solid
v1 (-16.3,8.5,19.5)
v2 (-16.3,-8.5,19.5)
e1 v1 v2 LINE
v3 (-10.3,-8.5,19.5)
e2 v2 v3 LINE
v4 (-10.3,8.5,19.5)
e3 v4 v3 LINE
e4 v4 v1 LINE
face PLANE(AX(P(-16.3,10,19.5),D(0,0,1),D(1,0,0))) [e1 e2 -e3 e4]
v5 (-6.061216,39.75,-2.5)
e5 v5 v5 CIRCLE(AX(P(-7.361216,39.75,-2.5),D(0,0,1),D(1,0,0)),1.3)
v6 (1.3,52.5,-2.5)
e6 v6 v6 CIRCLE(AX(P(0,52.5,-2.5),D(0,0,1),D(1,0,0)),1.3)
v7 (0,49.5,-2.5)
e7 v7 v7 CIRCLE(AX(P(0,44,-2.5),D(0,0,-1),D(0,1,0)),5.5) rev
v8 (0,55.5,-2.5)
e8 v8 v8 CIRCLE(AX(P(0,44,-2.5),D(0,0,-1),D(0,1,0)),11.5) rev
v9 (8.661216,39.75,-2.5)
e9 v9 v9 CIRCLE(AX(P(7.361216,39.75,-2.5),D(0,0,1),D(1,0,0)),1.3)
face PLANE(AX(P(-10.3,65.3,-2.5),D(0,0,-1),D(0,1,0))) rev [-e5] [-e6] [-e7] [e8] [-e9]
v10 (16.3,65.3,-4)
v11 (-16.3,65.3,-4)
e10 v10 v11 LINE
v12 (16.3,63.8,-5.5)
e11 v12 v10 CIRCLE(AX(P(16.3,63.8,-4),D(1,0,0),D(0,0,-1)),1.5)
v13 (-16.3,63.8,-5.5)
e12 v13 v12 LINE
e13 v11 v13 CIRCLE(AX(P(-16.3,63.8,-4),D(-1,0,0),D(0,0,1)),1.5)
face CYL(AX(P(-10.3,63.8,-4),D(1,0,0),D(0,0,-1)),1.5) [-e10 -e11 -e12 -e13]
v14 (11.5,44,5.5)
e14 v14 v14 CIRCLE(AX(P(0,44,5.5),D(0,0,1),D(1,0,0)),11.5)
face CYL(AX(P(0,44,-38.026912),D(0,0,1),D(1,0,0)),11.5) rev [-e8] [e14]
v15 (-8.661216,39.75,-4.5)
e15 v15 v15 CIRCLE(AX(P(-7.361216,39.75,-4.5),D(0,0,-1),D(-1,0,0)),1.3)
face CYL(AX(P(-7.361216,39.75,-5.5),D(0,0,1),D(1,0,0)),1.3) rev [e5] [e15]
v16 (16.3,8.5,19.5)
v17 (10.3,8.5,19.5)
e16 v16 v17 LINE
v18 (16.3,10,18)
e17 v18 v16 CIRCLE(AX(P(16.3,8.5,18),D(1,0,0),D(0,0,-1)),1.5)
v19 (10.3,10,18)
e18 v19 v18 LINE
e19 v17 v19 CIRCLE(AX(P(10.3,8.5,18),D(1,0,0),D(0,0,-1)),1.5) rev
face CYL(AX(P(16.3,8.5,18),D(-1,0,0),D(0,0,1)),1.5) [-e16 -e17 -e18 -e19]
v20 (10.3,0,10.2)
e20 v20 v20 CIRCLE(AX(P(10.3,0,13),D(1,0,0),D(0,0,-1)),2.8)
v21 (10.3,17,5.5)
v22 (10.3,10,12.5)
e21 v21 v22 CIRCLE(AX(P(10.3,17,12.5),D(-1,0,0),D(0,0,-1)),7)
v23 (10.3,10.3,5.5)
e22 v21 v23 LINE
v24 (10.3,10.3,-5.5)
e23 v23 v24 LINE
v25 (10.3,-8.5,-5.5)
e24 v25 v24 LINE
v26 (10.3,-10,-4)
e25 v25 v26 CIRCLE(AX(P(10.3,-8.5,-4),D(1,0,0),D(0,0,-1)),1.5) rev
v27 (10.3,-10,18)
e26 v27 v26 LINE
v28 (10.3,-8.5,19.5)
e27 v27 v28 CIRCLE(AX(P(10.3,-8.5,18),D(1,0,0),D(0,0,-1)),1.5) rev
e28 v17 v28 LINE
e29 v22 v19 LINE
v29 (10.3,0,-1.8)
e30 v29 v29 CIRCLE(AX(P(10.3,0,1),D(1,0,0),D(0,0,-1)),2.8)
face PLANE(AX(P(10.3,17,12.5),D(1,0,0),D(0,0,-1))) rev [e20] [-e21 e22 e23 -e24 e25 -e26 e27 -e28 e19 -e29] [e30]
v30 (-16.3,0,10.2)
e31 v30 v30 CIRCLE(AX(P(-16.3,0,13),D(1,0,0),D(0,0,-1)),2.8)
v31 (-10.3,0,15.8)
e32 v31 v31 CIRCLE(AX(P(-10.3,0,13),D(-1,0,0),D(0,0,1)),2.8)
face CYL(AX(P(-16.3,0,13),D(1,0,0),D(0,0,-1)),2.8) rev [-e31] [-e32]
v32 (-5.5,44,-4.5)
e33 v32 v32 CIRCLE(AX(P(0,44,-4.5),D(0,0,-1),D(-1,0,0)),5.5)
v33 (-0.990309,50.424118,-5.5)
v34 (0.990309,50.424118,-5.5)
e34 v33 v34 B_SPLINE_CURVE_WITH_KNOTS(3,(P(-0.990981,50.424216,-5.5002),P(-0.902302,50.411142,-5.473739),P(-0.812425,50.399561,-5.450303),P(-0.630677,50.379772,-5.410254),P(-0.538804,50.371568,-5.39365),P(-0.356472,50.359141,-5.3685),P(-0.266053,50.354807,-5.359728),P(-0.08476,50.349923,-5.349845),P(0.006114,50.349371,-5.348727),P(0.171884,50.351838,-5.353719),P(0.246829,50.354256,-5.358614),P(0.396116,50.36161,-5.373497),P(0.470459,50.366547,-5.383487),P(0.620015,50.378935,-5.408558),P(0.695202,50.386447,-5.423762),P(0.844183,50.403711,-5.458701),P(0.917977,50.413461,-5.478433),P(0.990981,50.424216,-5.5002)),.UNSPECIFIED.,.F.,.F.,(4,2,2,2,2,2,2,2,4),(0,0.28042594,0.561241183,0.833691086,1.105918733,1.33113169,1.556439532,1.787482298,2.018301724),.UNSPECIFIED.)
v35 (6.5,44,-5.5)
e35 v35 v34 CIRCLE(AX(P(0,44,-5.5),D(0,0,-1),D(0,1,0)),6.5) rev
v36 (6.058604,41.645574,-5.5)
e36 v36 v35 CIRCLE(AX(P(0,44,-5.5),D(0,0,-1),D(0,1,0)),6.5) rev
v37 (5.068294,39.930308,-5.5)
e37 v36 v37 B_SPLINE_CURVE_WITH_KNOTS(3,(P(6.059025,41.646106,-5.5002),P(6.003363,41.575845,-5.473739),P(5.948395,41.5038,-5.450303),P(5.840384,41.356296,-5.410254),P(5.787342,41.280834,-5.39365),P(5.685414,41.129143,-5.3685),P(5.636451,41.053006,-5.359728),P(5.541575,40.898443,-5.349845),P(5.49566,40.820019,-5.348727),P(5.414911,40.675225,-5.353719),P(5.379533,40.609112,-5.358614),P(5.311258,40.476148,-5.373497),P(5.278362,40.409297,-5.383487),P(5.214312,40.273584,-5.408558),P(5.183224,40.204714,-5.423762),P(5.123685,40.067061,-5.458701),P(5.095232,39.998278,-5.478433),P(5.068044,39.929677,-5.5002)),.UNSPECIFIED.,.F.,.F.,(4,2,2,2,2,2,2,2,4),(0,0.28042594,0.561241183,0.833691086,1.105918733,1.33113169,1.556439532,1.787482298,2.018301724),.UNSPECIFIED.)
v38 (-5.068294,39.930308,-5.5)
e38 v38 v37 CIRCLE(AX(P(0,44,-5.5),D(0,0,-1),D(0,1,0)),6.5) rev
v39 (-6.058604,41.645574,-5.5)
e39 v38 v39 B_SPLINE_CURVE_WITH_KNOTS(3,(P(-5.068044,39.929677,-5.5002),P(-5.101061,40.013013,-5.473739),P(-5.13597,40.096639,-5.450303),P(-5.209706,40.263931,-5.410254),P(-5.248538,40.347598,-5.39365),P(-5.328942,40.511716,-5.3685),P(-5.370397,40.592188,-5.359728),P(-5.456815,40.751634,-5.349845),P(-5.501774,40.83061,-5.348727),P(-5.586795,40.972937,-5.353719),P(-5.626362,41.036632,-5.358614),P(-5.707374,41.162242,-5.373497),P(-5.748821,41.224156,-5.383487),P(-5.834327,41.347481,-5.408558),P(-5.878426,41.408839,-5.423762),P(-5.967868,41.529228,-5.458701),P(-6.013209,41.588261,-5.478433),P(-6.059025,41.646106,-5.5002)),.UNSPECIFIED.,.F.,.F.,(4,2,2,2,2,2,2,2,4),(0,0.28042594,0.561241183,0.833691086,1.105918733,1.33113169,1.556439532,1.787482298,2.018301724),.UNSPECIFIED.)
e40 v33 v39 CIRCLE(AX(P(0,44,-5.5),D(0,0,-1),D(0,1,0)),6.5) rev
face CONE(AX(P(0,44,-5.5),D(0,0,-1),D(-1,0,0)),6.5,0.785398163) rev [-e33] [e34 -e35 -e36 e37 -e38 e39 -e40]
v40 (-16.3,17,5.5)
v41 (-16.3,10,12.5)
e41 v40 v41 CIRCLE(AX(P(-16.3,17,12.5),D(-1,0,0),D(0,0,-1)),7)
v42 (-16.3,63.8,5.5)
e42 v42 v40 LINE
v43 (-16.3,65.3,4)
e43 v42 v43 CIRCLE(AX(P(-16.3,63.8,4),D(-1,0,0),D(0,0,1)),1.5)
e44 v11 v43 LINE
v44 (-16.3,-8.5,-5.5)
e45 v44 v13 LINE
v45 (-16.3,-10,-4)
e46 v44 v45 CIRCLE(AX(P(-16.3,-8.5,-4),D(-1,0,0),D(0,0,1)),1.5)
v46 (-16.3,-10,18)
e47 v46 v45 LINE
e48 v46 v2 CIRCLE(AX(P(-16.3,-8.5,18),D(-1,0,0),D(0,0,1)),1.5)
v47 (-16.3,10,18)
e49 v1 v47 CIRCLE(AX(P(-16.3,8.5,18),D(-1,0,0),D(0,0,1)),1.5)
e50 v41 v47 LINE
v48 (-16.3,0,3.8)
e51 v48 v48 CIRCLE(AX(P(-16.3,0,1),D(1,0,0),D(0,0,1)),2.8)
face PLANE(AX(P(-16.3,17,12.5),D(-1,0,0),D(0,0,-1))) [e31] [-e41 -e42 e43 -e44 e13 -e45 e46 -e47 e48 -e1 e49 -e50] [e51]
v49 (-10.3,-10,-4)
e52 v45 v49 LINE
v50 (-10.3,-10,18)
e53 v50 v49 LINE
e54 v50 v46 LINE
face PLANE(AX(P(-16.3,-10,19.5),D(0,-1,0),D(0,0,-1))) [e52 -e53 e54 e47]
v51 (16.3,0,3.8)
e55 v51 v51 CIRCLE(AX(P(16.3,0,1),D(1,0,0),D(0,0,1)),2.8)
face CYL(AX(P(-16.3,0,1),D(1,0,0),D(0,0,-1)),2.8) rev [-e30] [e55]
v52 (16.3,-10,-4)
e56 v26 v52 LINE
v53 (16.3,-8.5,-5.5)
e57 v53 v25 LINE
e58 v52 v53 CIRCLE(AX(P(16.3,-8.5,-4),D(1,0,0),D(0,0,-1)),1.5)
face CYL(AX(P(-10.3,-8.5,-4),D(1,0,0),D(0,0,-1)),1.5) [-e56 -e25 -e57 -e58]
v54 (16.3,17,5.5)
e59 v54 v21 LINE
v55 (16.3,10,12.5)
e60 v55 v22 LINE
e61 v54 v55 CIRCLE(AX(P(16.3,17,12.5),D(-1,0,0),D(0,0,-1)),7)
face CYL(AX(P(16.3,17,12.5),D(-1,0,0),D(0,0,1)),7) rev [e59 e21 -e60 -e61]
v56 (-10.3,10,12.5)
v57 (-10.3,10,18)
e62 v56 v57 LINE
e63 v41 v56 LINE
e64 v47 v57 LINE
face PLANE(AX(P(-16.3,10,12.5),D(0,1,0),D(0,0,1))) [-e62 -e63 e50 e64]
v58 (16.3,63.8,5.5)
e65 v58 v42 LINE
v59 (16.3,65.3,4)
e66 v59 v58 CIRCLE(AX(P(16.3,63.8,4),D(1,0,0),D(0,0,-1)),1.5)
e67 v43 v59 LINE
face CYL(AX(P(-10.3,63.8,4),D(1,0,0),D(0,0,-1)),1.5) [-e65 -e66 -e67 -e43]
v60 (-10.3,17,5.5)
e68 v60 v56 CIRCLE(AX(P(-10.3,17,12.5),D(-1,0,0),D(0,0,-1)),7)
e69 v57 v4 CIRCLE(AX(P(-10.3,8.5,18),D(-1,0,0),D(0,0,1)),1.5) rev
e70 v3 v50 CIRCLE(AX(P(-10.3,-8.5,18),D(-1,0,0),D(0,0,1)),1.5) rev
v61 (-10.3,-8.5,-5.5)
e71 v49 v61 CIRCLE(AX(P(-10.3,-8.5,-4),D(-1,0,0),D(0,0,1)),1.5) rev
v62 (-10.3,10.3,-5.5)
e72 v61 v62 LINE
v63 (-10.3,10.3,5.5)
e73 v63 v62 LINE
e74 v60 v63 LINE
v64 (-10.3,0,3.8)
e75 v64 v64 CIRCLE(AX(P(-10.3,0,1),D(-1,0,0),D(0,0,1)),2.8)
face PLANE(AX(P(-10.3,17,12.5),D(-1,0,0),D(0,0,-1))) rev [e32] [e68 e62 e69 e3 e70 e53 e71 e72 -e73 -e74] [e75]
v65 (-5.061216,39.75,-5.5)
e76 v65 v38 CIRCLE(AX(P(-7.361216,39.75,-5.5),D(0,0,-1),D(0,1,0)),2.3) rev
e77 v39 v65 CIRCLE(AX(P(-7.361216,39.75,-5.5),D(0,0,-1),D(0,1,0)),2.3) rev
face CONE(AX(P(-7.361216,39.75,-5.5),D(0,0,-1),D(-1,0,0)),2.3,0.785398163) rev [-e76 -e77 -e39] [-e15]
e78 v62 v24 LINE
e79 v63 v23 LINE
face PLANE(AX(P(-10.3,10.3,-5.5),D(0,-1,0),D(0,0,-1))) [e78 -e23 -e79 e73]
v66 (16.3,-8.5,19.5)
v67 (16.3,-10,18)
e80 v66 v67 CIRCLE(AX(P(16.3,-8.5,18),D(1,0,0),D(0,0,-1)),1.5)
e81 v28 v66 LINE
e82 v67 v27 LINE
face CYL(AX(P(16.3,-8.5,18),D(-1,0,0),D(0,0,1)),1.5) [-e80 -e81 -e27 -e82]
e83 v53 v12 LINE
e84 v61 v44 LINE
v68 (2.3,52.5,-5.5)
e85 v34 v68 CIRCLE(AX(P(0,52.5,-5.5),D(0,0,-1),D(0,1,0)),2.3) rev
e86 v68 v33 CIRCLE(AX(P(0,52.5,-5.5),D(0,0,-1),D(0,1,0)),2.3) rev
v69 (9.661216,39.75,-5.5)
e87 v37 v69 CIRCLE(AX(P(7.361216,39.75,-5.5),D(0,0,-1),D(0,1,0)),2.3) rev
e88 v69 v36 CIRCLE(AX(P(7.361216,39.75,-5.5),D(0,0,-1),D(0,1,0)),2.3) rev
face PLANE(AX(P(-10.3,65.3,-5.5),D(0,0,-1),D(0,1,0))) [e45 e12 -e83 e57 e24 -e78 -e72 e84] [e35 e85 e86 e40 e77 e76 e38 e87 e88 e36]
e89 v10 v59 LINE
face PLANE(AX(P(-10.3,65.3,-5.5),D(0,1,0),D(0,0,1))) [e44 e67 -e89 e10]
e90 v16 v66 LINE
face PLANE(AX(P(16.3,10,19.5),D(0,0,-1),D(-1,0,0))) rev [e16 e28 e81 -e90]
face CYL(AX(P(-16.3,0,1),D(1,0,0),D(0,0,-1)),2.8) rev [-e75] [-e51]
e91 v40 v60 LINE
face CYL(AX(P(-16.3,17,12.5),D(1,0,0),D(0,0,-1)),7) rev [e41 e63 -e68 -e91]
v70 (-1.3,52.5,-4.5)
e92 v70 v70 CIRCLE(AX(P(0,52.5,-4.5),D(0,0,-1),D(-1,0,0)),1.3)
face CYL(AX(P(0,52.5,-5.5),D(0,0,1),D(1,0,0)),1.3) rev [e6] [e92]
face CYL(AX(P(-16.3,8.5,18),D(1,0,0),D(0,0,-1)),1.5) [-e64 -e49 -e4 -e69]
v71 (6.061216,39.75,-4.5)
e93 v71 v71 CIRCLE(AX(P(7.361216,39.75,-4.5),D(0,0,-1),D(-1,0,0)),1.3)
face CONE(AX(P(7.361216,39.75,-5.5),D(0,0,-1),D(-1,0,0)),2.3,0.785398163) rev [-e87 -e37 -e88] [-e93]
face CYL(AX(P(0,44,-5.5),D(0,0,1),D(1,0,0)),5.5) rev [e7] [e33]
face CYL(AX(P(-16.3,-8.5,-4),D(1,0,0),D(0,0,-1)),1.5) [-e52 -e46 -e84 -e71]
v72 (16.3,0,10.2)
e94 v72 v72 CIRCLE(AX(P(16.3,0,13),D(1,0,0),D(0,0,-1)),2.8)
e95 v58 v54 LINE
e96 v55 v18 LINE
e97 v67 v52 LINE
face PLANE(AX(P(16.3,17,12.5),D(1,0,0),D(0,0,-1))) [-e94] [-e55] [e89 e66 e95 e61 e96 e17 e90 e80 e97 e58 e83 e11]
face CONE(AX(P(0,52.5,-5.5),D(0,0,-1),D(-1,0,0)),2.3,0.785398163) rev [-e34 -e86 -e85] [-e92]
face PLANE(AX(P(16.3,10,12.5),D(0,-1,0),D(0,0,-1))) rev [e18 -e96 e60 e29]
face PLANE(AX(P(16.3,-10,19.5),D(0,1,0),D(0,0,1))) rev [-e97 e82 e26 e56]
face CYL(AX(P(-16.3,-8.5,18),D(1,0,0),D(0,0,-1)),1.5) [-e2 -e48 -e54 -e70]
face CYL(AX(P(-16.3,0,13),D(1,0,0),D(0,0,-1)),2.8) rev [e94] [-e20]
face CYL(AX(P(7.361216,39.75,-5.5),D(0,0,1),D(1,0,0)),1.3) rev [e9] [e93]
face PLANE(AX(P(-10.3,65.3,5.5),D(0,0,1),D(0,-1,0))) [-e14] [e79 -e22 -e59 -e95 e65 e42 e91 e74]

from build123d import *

# Parameters (mm, degrees)
EXTRUDE1_DEPTH      = 10.3
EXTRUDE1_DEPTH_BACK = 10.3
SKETCH1_W           = 11
SKETCH1_H           = 55
EXTRUDE2_DEPTH      = 6
SKETCH5_R           = 5.5
EXTRUDE4_DEPTH      = 69.744308855
SKETCH_1_R          = 2.8
CUT_EXTRUDE_1_DEPTH = 76.545350618
FILLET2_R           = 1.5
SKETCH_3_R          = 11.5
CUT_EXTRUDE_2_DEPTH = 8
SKETCH_4_R          = 1.3
CUT_EXTRUDE_3_DEPTH = 71.80805039
CHAMFER_1_SIZE      = 1


with BuildPart() as part:
    # Sketch1 → Extrude1 (new, two sides: drawn at the far end of the back side and taken through both)
    with BuildSketch(Plane(origin=(0, 0, 0), x_dir=(0, 0, -1), z_dir=(1, 0, 0)).offset(-EXTRUDE1_DEPTH_BACK)):
        with Locations((0, 37.8)):
            Rectangle(SKETCH1_W, SKETCH1_H)
    extrude(amount=EXTRUDE1_DEPTH + EXTRUDE1_DEPTH_BACK)

    # Sketch2 → Extrude2 (add)
    with BuildSketch(Plane(origin=(10.3, 0, 0), x_dir=(0, 0, -1), z_dir=(1, 0, 0))):
        with BuildLine():
            Line((-19.5, 10), (-19.5, -10))
            Line((-19.5, -10), (5.5, -10))
            Line((5.5, -10), (5.5, 17))
            Line((5.5, 17), (5.5, 65.3))
            Line((5.5, 65.3), (-5.5, 65.3))
            Line((-5.5, 65.3), (-5.5, 17))
            ThreePointArc((-5.5, 17), (-7.550252532, 12.050252532), (-12.5, 10))
            Line((-12.5, 10), (-19.5, 10))
        make_face()
    extrude2 = extrude(amount=EXTRUDE2_DEPTH)

    # Mirror2: Extrude2 across plane
    add(extrude2.mirror(Plane(origin=(0, 0, 0), x_dir=(0, 0, 1), z_dir=(1, 0, 0))))

    # Sketch5 → Extrude4 (cut, through all)
    with BuildSketch(Plane.XY.offset(5.5)):
        with Locations((0, 44)):
            Circle(SKETCH5_R)
    extrude(amount=-EXTRUDE4_DEPTH, mode=Mode.SUBTRACT)

    # Эскиз1 → Вырез-Вытянуть1 (cut, through all)
    with BuildSketch(Plane(origin=(16.3, 0, 0), x_dir=(0, 0, -1), z_dir=(1, 0, 0))):
        with Locations((-13, 0)):
            Circle(SKETCH_1_R)
        with Locations(Location((-1, 0, 0), (0, 0, 180))):
            Circle(SKETCH_1_R)
    extrude(amount=-CUT_EXTRUDE_1_DEPTH, mode=Mode.SUBTRACT)

    # Fillet2
    fillet2_edges = [part.edges().sort_by_distance(p)[0] for p in [
        (13.3, -10, 19.5),
        (13.3, -10, -5.5),
        (13.3, 10, 19.5),
        (-13.3, -10, -5.5),
        (-13.3, -10, 19.5),
        (-13.3, 10, 19.5),
        (0, 65.3, 5.5),
        (0, 65.3, -5.5),
    ]]
    fillet(fillet2_edges, radius=FILLET2_R)

    # Эскиз3 → Вырез-Вытянуть2 (cut)
    with BuildSketch(Plane.XY.offset(5.5)):
        with Locations((0, 44)):
            Circle(SKETCH_3_R)
    extrude(amount=-CUT_EXTRUDE_2_DEPTH, mode=Mode.SUBTRACT)

    # Эскиз4 → Вырез-Вытянуть3 (cut, through all)
    with BuildSketch(Plane.XY.offset(-2.5)):
        with Locations((0, 52.5)):
            Circle(SKETCH_4_R)
        with Locations((7.361215932, 39.75)):
            Circle(SKETCH_4_R)
        with Locations((-7.361215932, 39.75)):
            Circle(SKETCH_4_R)
    extrude(amount=-CUT_EXTRUDE_3_DEPTH, mode=Mode.SUBTRACT)

    # Фаска1
    # the kernel refuses this chamfer: 1 mm, written as the material it takes off along each edge
    with BuildSketch(Plane(origin=(0, 52.5, -5.5), x_dir=(1, 0, 0), z_dir=(0, -1, 0))) as chamfer_1_piece_1:
        Polygon((1.3 + CHAMFER_1_SIZE, 0), (1.3, CHAMFER_1_SIZE), (1.3, 0), align=None)
    revolve(axis=Axis((0, 52.5, -5.5), (0, 0, 1)), mode=Mode.SUBTRACT)
    with BuildSketch(Plane(origin=(7.361215932, 39.75, -5.5), x_dir=(1, 0, 0), z_dir=(0, -1, 0))) as chamfer_1_piece_2:
        Polygon((1.3 + CHAMFER_1_SIZE, 0), (1.3, CHAMFER_1_SIZE), (1.3, 0), align=None)
    revolve(axis=Axis((7.361215932, 39.75, -5.5), (0, 0, 1)), mode=Mode.SUBTRACT)
    with BuildSketch(Plane(origin=(-7.361215932, 39.75, -5.5), x_dir=(1, 0, 0), z_dir=(0, -1, 0))) as chamfer_1_piece_3:
        Polygon((1.3 + CHAMFER_1_SIZE, 0), (1.3, CHAMFER_1_SIZE), (1.3, 0), align=None)
    revolve(axis=Axis((-7.361215932, 39.75, -5.5), (0, 0, 1)), mode=Mode.SUBTRACT)
    with BuildSketch(Plane(origin=(0, 44, -5.5), x_dir=(1, 0, 0), z_dir=(0, -1, 0))) as chamfer_1_piece_4:
        Polygon((5.5 + CHAMFER_1_SIZE, 0), (5.5, CHAMFER_1_SIZE), (5.5, 0), align=None)
    revolve(axis=Axis((0, 44, -5.5), (0, 0, 1)), mode=Mode.SUBTRACT)


solid = part.part
